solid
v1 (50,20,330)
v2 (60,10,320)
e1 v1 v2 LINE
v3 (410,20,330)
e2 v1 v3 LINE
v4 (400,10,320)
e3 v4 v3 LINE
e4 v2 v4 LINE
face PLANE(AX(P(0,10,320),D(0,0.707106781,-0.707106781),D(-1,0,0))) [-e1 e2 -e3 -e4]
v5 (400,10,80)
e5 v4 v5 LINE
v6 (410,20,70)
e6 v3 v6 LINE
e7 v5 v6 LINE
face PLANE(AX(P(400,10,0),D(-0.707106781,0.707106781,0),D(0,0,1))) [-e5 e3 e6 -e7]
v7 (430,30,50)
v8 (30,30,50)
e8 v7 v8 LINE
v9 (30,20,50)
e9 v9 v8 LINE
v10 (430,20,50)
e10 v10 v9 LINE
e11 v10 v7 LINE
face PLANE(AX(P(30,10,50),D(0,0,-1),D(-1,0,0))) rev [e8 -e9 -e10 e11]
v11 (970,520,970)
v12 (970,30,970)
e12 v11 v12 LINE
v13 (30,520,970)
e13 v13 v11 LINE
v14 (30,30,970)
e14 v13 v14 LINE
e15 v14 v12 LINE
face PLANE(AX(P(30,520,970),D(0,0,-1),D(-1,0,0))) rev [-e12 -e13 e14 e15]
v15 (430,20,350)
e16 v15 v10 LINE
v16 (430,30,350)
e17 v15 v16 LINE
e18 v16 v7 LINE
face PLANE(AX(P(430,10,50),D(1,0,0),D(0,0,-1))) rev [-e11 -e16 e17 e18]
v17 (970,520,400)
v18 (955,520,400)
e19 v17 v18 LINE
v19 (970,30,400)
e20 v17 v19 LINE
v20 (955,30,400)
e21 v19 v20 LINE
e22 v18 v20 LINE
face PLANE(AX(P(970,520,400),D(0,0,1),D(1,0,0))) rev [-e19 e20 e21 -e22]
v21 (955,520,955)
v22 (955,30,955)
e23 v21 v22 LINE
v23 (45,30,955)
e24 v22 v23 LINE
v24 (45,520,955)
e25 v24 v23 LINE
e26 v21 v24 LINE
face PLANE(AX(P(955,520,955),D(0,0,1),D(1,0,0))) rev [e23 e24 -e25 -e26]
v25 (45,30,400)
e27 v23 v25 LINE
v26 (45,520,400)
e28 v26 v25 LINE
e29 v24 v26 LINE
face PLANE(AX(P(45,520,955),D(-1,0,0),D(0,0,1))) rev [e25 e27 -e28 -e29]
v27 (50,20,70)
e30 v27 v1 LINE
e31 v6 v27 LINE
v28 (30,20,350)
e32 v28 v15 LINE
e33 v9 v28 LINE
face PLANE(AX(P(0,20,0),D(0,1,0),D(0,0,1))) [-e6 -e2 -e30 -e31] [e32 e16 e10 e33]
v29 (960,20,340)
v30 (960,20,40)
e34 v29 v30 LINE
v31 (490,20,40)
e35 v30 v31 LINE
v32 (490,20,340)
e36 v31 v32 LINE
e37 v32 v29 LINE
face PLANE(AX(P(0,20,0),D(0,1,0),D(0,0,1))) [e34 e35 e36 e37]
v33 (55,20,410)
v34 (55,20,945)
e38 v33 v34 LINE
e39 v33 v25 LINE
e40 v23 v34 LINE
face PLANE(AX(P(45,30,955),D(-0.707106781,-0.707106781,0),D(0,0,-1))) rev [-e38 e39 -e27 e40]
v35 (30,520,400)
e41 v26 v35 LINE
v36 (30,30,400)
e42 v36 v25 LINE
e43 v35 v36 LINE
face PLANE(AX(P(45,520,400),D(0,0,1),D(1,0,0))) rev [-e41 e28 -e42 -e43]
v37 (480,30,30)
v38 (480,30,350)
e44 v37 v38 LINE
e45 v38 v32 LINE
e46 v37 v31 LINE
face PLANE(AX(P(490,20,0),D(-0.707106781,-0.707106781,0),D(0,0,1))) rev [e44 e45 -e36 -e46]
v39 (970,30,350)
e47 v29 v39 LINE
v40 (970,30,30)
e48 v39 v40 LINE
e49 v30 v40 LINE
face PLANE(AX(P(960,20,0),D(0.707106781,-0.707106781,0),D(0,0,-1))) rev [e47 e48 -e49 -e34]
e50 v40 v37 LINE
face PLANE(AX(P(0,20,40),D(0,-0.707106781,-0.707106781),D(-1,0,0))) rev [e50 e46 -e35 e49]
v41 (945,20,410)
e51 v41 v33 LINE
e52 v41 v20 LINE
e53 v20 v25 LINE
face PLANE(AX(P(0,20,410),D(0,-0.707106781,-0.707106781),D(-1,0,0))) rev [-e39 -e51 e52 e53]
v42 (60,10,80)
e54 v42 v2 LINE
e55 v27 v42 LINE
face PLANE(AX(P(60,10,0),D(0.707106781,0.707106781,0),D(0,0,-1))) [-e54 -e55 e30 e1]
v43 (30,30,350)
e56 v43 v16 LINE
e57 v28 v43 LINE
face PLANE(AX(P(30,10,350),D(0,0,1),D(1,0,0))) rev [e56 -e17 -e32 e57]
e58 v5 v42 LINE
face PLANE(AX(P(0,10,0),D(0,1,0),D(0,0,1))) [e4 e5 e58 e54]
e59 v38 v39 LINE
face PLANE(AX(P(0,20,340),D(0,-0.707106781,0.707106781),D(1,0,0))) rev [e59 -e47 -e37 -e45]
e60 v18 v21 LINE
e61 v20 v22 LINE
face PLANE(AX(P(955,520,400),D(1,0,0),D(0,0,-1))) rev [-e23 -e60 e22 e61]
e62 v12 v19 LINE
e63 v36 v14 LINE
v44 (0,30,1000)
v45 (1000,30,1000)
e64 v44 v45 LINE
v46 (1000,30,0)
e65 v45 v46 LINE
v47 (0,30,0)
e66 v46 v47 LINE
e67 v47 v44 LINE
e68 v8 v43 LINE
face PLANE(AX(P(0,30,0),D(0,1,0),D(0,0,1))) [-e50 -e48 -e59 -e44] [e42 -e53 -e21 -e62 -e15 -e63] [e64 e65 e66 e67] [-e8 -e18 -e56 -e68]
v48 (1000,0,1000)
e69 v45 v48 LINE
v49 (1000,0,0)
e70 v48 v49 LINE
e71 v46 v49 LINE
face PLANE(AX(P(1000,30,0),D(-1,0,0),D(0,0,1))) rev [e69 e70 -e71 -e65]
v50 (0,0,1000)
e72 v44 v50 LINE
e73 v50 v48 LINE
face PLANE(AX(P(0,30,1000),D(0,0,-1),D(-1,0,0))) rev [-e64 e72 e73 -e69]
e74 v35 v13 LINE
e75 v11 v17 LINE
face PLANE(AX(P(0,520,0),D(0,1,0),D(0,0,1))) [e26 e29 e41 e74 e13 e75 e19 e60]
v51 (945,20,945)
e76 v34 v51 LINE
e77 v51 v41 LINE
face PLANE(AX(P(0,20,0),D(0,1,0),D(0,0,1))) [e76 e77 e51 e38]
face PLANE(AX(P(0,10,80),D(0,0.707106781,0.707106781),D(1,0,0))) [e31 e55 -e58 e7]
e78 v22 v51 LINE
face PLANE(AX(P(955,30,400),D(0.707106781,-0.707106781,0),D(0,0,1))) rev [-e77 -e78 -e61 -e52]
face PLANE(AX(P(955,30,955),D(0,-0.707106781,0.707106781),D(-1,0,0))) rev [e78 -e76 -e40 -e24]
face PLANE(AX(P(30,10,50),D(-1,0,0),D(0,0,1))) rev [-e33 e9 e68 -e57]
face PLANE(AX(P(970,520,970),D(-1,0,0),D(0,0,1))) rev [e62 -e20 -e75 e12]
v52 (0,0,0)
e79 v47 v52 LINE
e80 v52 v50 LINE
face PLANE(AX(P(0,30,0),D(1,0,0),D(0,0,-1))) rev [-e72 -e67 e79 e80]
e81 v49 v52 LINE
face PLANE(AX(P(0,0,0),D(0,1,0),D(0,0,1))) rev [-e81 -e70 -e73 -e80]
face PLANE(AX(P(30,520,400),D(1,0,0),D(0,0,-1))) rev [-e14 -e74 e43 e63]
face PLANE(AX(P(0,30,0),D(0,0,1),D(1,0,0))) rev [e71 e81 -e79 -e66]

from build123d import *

# Parameters (mm, degrees)
SKETCH1_W           = 1000
SKETCH1_H           = 1000
BOSS_EXTRUDE1_DEPTH = 30
SKETCH2_W           = 400
SKETCH2_H           = 300
CUT_EXTRUDE1_DEPTH  = 20
SKETCH3_W           = 400
SKETCH3_H           = 300
SKETCH3_W_2         = 360
SKETCH3_H_2         = 260
BOSS_EXTRUDE2_DEPTH = 10
CHAMFER1_SIZE       = 10
SKETCH5_W           = 490
SKETCH5_H           = 320
SKETCH5_W_2         = 940
SKETCH5_H_2         = 570
CUT_EXTRUDE2_DEPTH  = 10
BOSS_EXTRUDE5_DEPTH = 500
CHAMFER3_SIZE       = 10


with BuildPart() as part:
    # Sketch1 → Boss-Extrude1 (new body)
    with BuildSketch(Plane(origin=(0, 0, 0), x_dir=(1, 0, 0), z_dir=(0, 1, 0))):
        with Locations((500, -500)):
            Rectangle(SKETCH1_W, SKETCH1_H)
    extrude(amount=BOSS_EXTRUDE1_DEPTH)

    # Sketch2 → Cut-Extrude1 (cut)
    with BuildSketch(Plane(origin=(0, 30, 0), x_dir=(1, 0, 0), z_dir=(0, 1, 0))):
        with Locations((230, -200)):
            Rectangle(SKETCH2_W, SKETCH2_H)
    extrude(amount=-CUT_EXTRUDE1_DEPTH, mode=Mode.SUBTRACT)

    # Sketch3 → Boss-Extrude2 (add)
    with BuildSketch(Plane(origin=(0, 10, 0), x_dir=(1, 0, 0), z_dir=(0, 1, 0))):
        with Locations((230, -200)):
            Rectangle(SKETCH3_W, SKETCH3_H)
        with Locations((230, -200)):
            Rectangle(SKETCH3_W_2, SKETCH3_H_2, mode=Mode.SUBTRACT)
    extrude(amount=BOSS_EXTRUDE2_DEPTH)

    # Chamfer1
    chamfer1_edges = [part.edges().sort_by_distance(p)[0] for p in [
        (230, 10, 70),
        (410, 10, 200),
        (230, 10, 330),
        (50, 10, 200),
    ]]
    chamfer(chamfer1_edges, length=CHAMFER1_SIZE - 0.0001)  # a hair under: the kernel refuses the full size

    # Sketch5 → Cut-Extrude2 (cut)
    with BuildSketch(Plane(origin=(0, 30, 0), x_dir=(1, 0, 0), z_dir=(0, 1, 0))):
        with Locations((725, -190)):
            Rectangle(SKETCH5_W, SKETCH5_H)
        with Locations((500, -685)):
            Rectangle(SKETCH5_W_2, SKETCH5_H_2)
    extrude(amount=-CUT_EXTRUDE2_DEPTH, mode=Mode.SUBTRACT)

    # Sketch7 → Boss-Extrude5 (add)
    with BuildSketch(Plane(origin=(0, 20, 0), x_dir=(1, 0, 0), z_dir=(0, 1, 0))):
        Polygon((970, -400), (955, -400), (955, -955), (45, -955), (45, -400), (30, -400), (30, -970), (970, -970), align=None)
    extrude(amount=BOSS_EXTRUDE5_DEPTH)

    # Chamfer3
    chamfer3_edges = [part.edges().sort_by_distance(p)[0] for p in [
        (725, 20, 30),
        (970, 20, 190),
        (725, 20, 350),
        (480, 20, 190),
        (45, 20, 677.5),
        (500, 20, 400),
        (955, 20, 677.5),
        (500, 20, 955),
    ]]
    chamfer(chamfer3_edges, length=CHAMFER3_SIZE - 0.0001)  # a hair under: the kernel refuses the full size


solid = part.part
